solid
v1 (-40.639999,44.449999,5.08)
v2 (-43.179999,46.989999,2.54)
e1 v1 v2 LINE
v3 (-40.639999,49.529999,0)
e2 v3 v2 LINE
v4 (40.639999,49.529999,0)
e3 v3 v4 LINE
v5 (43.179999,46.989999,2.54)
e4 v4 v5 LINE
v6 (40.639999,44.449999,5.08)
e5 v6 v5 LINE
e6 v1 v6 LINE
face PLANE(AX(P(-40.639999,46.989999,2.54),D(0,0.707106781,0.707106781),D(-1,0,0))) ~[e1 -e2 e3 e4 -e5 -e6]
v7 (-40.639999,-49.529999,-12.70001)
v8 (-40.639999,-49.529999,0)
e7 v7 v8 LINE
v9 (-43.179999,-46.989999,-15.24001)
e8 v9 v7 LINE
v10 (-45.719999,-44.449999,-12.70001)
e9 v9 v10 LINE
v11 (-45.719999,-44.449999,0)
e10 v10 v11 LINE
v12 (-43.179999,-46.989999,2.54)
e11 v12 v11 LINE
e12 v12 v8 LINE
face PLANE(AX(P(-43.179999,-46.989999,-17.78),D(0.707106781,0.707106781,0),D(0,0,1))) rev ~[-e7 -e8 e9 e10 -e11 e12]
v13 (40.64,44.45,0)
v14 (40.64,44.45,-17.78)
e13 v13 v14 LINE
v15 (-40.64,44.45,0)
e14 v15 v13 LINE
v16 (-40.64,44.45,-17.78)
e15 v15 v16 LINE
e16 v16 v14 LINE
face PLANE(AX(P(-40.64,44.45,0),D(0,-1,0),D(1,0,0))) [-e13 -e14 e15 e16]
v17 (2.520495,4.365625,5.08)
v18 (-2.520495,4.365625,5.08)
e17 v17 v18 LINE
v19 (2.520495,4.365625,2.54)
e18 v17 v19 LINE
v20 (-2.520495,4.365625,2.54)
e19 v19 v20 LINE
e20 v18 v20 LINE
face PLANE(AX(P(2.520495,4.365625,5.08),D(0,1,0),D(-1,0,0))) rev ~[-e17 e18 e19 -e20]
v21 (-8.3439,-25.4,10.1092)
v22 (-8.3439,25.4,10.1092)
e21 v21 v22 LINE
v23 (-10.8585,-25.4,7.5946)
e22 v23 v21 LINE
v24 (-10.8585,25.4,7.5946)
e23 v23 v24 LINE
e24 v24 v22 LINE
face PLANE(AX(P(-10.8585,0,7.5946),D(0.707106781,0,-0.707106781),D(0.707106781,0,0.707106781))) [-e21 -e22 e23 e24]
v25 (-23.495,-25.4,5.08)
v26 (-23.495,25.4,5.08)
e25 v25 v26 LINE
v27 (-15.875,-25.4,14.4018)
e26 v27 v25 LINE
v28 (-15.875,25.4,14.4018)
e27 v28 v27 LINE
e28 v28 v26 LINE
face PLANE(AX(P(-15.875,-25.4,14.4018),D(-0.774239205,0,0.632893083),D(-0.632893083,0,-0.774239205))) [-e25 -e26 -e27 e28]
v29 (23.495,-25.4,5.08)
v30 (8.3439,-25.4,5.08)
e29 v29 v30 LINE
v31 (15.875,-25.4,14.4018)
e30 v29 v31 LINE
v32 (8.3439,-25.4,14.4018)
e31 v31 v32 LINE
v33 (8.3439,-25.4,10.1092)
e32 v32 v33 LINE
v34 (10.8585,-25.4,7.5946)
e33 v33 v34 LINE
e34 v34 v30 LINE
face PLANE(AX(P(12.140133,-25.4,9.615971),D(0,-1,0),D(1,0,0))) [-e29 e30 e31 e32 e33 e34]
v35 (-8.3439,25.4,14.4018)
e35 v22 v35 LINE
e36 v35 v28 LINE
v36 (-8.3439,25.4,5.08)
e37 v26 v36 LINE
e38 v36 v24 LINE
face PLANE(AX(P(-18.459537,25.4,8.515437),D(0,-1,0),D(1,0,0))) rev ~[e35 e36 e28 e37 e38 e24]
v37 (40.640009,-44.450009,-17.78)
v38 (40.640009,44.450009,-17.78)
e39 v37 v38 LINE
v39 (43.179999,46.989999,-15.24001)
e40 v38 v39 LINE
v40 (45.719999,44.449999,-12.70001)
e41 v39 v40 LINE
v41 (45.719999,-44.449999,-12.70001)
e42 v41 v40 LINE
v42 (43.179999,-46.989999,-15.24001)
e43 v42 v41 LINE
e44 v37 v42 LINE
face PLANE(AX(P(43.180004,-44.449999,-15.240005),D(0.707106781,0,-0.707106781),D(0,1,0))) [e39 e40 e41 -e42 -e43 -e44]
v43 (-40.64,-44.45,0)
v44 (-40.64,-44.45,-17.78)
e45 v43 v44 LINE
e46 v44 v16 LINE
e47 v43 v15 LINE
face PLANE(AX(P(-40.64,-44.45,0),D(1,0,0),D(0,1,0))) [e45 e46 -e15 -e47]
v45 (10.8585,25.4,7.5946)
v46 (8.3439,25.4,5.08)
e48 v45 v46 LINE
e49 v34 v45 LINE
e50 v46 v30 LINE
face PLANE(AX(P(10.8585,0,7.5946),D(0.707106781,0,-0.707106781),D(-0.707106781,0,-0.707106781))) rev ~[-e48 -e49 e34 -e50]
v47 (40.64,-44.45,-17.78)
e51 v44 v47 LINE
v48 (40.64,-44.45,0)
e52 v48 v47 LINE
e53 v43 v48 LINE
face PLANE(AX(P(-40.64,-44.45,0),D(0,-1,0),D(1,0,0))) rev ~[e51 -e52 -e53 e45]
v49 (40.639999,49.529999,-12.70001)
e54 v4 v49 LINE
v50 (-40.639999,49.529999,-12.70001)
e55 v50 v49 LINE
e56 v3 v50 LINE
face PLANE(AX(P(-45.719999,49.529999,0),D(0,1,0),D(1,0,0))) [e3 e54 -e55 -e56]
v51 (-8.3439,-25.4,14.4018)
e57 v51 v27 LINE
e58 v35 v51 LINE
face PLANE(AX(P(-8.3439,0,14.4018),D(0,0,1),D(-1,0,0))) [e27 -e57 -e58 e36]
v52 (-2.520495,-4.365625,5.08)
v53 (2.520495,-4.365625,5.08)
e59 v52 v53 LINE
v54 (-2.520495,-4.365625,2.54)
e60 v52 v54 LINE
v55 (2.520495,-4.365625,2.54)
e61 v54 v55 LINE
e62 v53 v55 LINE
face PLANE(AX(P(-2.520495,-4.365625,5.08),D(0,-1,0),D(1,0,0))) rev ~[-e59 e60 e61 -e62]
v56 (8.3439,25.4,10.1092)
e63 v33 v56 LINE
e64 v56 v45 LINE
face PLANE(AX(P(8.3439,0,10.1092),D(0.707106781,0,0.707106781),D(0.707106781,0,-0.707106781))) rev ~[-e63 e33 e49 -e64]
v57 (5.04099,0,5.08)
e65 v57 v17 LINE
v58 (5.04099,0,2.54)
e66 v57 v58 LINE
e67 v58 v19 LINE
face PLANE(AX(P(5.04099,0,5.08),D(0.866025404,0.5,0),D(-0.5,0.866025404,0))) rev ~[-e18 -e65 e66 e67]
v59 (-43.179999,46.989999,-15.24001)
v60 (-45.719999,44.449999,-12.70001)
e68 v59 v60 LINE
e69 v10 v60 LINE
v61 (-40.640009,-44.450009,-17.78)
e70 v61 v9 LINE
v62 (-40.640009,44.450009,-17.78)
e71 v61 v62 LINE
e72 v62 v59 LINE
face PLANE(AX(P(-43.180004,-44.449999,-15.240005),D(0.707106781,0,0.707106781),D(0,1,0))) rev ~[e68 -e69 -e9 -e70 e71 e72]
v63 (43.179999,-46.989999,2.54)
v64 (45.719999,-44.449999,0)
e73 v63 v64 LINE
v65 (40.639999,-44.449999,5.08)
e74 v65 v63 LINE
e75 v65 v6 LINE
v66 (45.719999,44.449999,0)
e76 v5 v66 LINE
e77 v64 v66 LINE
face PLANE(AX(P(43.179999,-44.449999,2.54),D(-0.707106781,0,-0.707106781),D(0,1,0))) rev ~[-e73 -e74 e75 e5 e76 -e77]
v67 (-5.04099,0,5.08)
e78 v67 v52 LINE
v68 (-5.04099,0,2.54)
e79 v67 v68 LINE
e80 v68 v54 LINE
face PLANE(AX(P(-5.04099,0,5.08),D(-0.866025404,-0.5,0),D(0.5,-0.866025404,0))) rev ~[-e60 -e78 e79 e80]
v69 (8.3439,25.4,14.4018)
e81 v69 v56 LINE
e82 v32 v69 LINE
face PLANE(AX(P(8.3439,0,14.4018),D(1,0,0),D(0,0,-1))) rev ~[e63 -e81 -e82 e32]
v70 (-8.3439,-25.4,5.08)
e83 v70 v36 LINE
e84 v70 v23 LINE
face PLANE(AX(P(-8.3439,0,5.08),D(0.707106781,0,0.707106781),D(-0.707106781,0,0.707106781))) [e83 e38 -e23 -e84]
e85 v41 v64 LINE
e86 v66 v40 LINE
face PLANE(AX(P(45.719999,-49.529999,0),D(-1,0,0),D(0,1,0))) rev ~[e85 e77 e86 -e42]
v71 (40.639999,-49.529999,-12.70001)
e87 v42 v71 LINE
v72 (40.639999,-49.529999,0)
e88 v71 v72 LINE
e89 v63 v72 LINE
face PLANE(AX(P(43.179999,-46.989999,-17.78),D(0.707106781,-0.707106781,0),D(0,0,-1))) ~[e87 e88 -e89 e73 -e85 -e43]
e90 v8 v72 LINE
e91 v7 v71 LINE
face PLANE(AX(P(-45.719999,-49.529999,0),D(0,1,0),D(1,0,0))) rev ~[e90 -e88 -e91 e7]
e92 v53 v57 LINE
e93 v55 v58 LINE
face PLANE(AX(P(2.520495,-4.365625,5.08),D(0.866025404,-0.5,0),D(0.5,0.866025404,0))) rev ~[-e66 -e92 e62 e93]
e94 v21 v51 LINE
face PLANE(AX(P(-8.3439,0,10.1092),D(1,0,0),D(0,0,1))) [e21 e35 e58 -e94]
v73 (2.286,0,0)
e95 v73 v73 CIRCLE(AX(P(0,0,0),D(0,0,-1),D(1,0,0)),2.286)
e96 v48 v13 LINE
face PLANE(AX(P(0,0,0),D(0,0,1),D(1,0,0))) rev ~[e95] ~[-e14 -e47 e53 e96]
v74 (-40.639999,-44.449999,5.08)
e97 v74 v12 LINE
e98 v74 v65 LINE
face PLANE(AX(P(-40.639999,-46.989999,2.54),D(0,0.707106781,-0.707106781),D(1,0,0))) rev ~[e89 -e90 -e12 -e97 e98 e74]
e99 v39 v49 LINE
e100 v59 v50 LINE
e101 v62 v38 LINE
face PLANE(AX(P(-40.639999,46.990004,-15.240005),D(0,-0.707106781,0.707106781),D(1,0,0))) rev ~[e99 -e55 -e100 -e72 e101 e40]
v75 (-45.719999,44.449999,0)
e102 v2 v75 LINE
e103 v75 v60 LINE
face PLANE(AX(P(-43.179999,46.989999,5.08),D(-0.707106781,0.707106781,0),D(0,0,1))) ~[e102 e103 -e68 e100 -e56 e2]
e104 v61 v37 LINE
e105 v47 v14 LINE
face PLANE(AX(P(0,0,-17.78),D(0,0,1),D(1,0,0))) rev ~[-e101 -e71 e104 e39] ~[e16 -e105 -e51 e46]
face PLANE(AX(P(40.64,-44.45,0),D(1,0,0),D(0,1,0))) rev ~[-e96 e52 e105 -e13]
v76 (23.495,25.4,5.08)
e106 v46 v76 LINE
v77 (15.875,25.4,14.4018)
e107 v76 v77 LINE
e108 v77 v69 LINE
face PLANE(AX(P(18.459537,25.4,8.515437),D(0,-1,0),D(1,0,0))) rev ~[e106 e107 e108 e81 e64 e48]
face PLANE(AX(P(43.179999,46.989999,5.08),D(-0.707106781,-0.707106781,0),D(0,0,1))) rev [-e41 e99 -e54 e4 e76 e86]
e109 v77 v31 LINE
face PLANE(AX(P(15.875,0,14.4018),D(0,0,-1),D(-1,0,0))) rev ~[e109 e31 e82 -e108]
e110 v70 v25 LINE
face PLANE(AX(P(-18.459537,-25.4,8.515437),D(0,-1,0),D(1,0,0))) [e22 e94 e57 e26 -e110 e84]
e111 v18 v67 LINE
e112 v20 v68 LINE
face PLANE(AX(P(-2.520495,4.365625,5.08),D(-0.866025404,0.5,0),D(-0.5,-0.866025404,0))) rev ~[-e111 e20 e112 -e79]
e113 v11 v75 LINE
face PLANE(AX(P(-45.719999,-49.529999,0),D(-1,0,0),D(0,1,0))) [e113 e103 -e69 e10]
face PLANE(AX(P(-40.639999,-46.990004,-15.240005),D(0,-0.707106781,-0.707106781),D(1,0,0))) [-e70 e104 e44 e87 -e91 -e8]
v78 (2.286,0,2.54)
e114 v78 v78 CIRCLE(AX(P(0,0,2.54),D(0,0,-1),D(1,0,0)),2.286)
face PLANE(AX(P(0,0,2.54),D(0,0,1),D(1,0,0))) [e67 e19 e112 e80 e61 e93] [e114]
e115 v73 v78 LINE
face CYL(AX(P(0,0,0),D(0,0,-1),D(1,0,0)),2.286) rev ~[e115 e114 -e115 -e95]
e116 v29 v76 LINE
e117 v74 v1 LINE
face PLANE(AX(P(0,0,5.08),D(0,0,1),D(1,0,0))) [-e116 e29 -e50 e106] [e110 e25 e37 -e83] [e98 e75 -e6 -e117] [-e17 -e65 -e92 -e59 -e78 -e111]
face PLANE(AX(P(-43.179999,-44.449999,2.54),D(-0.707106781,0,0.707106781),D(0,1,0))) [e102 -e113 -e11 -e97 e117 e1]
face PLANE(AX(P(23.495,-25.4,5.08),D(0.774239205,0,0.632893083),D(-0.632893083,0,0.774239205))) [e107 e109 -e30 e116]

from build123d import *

# Parameters (mm, degrees)
F0_W       = 91.4399989891
F0_H       = 99.0599989891
F0_W_2     = 81.28
F0_H_2     = 88.9
F1_DEPTH   = 17.78
F2_W       = 91.4399989891
F2_H       = 99.0599989891
F3_DEPTH   = 5.08
F4_SIZE    = 5.08
F6_DEPTH   = 25.4
F7_R       = 2.286
F8_DEPTH   = 25.4
F10_DEPTH  = 2.54
F11_SIZE   = 5.07999
F11_SIZE_2 = 5.08
F13_DEPTH  = 50.8


# Not quite as in the source:
# - a fillet or chamfer is up to 0.001 mm smaller than in the source, because OpenCascade refuses the exact size


with BuildPart() as f1:
    # F0 (on Top) → F1 (new body)
    with BuildSketch(Plane.XY):
        Rectangle(F0_W, F0_H)
        Rectangle(F0_W_2, F0_H_2, mode=Mode.SUBTRACT)
    extrude(amount=-F1_DEPTH)

    # F2 (on face) → F3 (join)
    with BuildSketch(Plane.XY):
        Rectangle(F2_W, F2_H)
    extrude(amount=F3_DEPTH)

    # F4
    f4_edges = [f1.edges().sort_by_distance(p)[0] for p in [
        (-45.719999, 49.529999, -6.35),
        (45.719999, 49.529999, -6.35),
        (45.719999, -49.529999, -6.35),
        (-45.719999, -49.529999, -6.35),
    ]]
    chamfer(f4_edges, length=F4_SIZE)

    # F5 (on Front) → F6 (join, symmetric)
    with BuildSketch(Plane.XZ):
        Polygon((10.8585, 7.5946), (8.3439, 5.08), (15.875, 5.08), (15.875, 14.4018), (8.3439, 14.4018), (8.3439, 10.1092), align=None)
        Polygon((-8.3439, 10.1092), (-8.3439, 14.4018), (-15.875, 14.4018), (-15.875, 5.08), (-8.3439, 5.08), (-10.8585, 7.5946), align=None)
    extrude(amount=F6_DEPTH, both=True)

    # F7 (on face) → F8 (cut)
    with BuildSketch(Plane(origin=(0, 0, 0), x_dir=(1, 0, 0), z_dir=(0, 0, -1))):
        Circle(F7_R)
    extrude(amount=-F8_DEPTH, mode=Mode.SUBTRACT)

    # F9 (on face) → F10 (cut)
    with BuildSketch(Plane.XY.offset(5.08)):
        Polygon((2.5204947689, 4.365625), (-2.5204947689, 4.365625), (-5.0409895379, 0), (-2.5204947689, -4.365625), (2.5204947689, -4.365625), (5.0409895379, 0), align=None)
    extrude(amount=-F10_DEPTH, mode=Mode.SUBTRACT)

    # F11 (call 1 of 8: OpenCascade refuses the feature's edges together) (size 5.08 in the source; OpenCascade refuses exactly that, so slightly less here)
    f11_edges = [f1.edges().sort_by_distance(p)[0] for p in [
        (0, 49.529999, -17.78),
    ]]
    chamfer(f11_edges, length=F11_SIZE)

    # F11#2 (call 2 of 8) (size 5.08 in the source; OpenCascade refuses exactly that, so slightly less here)
    f11_2_edges = [f1.edges().sort_by_distance(p)[0] for p in [
        (-45.719999, 0, -17.78),
    ]]
    chamfer(f11_2_edges, length=F11_SIZE)

    # F11#3 (call 3 of 8) (size 5.08 in the source; OpenCascade refuses exactly that, so slightly less here)
    f11_3_edges = [f1.edges().sort_by_distance(p)[0] for p in [
        (0, -49.529999, -17.78),
    ]]
    chamfer(f11_3_edges, length=F11_SIZE)

    # F11#4 (call 4 of 8) (size 5.08 in the source; OpenCascade refuses exactly that, so slightly less here)
    f11_4_edges = [f1.edges().sort_by_distance(p)[0] for p in [
        (45.719999, 0, -17.78),
    ]]
    chamfer(f11_4_edges, length=F11_SIZE)

    # F11#5 (call 5 of 8)
    f11_5_edges = [f1.edges().sort_by_distance(p)[0] for p in [
        (0, 49.529999, 5.08),
    ]]
    chamfer(f11_5_edges, length=F11_SIZE_2)

    # F11#6 (call 6 of 8)
    f11_6_edges = [f1.edges().sort_by_distance(p)[0] for p in [
        (-45.719999, 0, 5.08),
    ]]
    chamfer(f11_6_edges, length=F11_SIZE_2)

    # F11#7 (call 7 of 8)
    f11_7_edges = [f1.edges().sort_by_distance(p)[0] for p in [
        (0, -49.529999, 5.08),
    ]]
    chamfer(f11_7_edges, length=F11_SIZE_2)

    # F11#8 (call 8 of 8)
    f11_8_edges = [f1.edges().sort_by_distance(p)[0] for p in [
        (45.719999, 0, 5.08),
    ]]
    chamfer(f11_8_edges, length=F11_SIZE_2)

    # F12 (on face) → F13 (join, through all)
    with BuildSketch(Plane.XZ.offset(25.4)):
        Polygon((-15.875, 14.4018), (-23.495, 5.08), (-15.875, 5.08), align=None)
        Polygon((23.495, 5.08), (15.875, 14.4018), (15.875, 5.08), align=None)
    extrude(amount=-F13_DEPTH)


solid = f1.part
